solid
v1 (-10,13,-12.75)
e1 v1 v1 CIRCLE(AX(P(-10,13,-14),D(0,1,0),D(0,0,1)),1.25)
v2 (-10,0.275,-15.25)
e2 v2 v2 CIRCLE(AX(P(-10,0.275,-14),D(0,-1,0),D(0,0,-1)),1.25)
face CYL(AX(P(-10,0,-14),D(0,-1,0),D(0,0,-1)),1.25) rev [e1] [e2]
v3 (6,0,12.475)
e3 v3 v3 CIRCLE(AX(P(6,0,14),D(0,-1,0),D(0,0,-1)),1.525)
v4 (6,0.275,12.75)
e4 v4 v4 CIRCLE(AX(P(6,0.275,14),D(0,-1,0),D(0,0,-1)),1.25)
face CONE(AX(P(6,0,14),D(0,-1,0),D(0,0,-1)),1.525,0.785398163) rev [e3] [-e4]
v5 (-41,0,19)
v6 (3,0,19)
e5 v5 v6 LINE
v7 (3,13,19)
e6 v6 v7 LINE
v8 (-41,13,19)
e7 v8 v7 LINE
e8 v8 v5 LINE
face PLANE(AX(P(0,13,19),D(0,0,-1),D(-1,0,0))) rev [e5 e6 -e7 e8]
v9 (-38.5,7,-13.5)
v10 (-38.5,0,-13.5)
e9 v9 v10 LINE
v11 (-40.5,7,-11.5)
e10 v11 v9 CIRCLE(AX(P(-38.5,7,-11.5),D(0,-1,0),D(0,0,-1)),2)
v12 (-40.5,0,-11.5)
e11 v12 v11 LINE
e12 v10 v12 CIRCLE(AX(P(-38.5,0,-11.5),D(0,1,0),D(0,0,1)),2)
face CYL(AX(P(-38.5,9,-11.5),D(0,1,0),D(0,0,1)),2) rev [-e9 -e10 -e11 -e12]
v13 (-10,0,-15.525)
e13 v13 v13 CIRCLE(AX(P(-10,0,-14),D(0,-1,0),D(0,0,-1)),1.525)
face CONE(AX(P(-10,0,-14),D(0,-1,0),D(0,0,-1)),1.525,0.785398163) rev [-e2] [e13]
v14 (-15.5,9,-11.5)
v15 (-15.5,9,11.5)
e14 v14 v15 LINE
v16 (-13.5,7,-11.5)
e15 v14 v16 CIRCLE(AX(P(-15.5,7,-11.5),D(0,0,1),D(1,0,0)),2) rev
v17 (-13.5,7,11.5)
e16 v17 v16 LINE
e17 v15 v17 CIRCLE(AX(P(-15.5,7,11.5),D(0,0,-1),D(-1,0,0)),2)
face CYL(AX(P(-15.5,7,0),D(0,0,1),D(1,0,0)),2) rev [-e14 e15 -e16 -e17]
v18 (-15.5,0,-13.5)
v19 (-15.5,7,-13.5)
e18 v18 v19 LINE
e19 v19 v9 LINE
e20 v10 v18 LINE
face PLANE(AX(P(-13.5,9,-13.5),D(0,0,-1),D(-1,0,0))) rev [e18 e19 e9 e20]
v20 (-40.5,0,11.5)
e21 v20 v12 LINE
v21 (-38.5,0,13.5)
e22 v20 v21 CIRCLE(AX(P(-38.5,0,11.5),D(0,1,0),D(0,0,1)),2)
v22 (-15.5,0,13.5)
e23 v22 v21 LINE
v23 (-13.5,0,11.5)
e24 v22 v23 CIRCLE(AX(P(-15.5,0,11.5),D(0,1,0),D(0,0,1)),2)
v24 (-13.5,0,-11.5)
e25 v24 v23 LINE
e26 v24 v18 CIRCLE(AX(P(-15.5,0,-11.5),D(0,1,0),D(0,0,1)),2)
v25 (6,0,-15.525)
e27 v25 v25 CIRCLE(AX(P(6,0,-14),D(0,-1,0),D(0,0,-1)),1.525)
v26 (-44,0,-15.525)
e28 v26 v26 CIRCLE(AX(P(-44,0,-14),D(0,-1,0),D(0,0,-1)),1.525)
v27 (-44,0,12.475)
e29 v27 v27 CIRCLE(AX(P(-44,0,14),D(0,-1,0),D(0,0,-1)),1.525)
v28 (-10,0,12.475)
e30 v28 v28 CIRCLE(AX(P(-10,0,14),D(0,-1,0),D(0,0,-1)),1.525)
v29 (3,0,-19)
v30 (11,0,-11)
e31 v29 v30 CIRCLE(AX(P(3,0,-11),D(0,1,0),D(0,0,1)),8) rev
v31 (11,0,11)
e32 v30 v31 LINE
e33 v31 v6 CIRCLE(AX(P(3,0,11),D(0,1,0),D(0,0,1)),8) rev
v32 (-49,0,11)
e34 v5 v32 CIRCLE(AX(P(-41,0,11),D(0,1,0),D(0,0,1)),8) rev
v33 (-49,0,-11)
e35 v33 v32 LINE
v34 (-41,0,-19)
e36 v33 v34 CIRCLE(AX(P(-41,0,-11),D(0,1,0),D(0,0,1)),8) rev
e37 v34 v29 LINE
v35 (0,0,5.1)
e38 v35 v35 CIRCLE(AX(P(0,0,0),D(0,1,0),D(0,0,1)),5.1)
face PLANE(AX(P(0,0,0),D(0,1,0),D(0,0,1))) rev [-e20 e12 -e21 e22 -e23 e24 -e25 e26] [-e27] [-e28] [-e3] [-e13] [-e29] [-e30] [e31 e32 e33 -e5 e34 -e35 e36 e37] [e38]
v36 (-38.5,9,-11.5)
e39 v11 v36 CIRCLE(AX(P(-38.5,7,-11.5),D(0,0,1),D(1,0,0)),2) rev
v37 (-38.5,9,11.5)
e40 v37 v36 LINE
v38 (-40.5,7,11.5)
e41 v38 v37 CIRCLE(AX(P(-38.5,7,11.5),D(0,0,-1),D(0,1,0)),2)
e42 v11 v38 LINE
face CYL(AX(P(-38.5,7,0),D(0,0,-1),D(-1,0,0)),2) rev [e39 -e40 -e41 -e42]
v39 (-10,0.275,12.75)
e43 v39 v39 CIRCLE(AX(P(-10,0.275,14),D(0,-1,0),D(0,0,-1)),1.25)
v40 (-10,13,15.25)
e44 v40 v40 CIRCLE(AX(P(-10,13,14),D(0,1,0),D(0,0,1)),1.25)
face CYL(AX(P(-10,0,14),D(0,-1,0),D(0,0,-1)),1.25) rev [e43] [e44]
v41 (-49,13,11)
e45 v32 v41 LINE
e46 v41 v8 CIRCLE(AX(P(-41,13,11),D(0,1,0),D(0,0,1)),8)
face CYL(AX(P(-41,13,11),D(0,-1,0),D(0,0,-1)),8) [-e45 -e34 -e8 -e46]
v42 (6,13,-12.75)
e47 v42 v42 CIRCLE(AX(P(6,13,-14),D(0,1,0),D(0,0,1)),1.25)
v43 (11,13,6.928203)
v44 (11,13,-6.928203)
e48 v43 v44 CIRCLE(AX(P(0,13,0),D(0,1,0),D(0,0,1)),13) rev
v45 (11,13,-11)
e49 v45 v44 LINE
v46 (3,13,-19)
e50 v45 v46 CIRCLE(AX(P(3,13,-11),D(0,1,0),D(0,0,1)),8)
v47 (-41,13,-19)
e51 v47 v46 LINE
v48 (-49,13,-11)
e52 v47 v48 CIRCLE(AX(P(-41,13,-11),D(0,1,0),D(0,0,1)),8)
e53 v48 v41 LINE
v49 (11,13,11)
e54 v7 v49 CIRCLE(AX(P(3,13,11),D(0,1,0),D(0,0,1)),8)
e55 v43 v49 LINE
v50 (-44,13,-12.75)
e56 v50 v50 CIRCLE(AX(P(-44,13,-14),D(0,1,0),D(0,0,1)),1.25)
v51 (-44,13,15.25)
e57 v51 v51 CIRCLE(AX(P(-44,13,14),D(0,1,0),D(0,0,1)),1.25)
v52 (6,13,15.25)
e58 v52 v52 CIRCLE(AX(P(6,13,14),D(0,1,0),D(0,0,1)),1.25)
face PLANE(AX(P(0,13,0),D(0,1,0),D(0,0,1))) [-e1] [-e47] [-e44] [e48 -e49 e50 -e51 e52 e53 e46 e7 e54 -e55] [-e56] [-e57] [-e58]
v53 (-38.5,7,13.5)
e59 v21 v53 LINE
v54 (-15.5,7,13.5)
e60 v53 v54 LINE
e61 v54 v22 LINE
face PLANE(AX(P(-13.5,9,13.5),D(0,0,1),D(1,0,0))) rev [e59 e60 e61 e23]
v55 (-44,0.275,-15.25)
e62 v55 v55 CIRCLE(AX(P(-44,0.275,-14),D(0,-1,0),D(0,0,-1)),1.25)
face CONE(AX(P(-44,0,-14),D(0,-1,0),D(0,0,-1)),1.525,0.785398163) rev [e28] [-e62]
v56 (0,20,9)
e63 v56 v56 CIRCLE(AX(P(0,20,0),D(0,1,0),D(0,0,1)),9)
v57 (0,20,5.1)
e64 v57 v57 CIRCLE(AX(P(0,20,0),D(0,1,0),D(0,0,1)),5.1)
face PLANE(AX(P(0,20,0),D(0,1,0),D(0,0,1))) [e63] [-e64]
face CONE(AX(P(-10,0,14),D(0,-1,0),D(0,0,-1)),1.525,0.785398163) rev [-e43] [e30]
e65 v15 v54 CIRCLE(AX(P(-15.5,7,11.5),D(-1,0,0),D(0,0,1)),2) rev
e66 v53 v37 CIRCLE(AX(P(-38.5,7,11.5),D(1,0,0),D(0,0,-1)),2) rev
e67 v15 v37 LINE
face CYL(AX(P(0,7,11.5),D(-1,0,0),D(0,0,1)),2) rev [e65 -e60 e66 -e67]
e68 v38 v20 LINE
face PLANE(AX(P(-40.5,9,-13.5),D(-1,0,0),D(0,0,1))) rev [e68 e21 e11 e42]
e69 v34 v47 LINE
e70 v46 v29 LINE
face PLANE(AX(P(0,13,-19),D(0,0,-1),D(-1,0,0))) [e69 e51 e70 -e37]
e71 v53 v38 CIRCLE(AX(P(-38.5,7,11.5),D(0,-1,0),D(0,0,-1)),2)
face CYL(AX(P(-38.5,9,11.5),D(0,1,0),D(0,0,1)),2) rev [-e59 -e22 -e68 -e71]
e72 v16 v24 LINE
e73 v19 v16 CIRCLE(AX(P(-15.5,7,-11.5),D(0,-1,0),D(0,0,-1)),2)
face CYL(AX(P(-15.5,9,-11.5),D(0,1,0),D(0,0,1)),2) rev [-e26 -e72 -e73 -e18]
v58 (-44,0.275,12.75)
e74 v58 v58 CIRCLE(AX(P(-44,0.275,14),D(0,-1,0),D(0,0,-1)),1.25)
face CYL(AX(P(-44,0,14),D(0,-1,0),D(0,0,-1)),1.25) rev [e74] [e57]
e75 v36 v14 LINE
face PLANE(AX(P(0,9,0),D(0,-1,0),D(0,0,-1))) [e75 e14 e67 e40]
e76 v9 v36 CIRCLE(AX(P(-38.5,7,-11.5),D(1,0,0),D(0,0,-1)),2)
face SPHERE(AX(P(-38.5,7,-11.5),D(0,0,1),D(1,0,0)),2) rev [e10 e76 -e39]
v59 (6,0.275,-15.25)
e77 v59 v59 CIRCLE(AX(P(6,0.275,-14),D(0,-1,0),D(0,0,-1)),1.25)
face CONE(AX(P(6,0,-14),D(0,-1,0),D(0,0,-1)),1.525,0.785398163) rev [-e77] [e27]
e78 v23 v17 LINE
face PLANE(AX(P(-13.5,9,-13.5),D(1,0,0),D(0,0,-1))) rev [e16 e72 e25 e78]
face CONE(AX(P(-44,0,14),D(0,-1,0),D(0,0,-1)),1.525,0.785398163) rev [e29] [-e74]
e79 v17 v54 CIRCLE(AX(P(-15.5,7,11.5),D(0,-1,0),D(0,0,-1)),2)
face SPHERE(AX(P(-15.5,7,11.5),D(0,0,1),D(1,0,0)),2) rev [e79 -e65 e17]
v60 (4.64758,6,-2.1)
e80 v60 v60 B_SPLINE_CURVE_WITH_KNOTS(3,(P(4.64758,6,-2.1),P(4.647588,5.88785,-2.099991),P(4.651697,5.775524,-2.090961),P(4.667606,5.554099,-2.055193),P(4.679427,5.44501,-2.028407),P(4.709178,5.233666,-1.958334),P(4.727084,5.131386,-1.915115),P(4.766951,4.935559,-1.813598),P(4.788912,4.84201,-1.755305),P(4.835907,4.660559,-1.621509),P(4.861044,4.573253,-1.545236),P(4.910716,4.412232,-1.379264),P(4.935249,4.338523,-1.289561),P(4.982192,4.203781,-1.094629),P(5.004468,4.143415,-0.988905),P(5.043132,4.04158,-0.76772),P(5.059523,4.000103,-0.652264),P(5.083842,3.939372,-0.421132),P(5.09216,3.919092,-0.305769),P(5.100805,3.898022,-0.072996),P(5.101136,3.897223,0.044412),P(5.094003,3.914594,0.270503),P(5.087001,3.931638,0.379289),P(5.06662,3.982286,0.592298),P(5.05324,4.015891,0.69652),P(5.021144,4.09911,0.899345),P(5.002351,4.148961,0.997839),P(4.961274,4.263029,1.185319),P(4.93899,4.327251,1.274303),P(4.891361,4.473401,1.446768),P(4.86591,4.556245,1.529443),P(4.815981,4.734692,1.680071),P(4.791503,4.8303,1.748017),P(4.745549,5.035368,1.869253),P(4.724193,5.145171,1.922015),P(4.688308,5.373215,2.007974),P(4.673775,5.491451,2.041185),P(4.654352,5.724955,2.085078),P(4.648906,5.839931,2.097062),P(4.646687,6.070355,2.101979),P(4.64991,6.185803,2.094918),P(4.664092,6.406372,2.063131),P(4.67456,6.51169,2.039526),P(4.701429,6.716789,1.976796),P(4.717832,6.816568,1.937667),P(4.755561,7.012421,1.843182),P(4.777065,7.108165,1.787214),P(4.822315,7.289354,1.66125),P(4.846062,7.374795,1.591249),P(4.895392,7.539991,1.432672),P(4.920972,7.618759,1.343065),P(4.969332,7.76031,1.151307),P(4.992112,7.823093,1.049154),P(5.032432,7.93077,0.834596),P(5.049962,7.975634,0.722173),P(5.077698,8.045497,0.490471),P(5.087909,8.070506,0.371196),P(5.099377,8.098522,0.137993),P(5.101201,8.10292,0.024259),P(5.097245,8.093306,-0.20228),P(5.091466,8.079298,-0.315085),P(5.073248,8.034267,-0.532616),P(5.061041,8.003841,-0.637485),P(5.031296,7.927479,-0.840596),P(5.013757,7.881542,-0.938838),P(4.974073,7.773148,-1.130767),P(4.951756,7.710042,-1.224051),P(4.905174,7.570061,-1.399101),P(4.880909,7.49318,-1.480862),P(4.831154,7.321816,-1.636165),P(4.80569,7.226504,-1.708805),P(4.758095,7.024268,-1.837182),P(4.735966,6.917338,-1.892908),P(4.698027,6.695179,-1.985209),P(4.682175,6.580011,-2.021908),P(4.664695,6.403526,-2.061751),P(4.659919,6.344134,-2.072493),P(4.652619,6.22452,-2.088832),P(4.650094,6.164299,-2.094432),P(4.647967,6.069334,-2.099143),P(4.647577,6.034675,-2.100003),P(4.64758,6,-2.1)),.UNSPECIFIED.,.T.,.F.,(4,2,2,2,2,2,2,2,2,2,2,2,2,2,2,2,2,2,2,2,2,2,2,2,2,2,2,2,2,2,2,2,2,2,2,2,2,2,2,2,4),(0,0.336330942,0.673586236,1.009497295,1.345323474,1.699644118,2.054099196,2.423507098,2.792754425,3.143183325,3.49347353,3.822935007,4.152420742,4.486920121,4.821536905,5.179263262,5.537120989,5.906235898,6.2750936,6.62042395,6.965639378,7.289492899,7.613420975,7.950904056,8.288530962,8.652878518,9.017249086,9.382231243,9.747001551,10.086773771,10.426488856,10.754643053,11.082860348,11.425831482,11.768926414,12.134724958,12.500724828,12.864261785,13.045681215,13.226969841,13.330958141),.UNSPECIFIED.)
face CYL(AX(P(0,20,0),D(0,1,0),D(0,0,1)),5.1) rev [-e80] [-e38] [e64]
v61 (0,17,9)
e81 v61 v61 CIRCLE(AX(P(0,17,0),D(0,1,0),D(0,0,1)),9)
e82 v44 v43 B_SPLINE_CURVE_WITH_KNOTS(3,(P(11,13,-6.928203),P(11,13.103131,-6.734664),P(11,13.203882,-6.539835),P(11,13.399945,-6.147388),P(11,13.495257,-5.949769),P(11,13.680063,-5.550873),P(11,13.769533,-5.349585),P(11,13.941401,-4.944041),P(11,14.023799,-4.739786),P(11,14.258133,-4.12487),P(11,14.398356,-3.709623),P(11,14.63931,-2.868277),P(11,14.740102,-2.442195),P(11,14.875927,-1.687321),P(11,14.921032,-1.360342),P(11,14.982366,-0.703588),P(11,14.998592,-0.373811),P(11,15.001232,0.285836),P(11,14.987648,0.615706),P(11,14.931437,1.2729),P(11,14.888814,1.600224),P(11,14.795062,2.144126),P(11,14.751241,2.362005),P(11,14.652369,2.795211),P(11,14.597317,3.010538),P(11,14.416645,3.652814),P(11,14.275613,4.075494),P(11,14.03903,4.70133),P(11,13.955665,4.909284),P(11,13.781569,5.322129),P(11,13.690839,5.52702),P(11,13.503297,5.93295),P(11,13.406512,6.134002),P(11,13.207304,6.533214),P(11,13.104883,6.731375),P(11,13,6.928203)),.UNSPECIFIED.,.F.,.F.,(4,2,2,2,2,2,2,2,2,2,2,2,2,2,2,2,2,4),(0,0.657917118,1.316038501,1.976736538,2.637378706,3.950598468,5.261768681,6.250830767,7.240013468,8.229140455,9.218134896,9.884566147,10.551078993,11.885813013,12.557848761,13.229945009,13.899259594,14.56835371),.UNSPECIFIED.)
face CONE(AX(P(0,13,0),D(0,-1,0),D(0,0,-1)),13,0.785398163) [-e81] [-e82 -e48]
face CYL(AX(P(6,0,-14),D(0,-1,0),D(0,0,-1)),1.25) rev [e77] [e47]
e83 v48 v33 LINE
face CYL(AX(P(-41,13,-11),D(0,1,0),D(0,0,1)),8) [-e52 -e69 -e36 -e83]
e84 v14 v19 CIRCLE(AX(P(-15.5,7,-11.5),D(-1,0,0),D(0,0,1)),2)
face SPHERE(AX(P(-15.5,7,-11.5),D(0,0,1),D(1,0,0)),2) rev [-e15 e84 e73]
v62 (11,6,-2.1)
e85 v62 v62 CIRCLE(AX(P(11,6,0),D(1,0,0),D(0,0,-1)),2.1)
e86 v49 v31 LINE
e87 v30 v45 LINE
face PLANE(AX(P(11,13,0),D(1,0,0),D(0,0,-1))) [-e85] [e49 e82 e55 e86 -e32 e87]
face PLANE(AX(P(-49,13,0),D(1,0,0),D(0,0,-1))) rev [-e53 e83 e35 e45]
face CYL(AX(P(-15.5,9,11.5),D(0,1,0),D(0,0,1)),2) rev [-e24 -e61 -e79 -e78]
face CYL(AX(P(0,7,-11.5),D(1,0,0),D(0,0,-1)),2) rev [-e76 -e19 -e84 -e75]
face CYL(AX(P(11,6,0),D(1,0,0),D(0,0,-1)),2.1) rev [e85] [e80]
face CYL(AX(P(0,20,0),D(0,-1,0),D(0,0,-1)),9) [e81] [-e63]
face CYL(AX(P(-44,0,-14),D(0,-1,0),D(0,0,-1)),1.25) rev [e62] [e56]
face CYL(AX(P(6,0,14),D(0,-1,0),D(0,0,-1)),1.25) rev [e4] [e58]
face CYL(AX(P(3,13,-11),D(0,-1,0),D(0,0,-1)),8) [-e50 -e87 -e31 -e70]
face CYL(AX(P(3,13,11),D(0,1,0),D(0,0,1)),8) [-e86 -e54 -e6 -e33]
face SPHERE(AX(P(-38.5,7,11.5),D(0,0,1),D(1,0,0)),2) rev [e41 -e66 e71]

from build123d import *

# Parameters (mm, degrees)
SKETCH1_W                               = 60
SKETCH1_H                               = 38
BASE_DEPTH                              = 13
ADDALITTLEBEAUTY_R                      = 8
SKETCH1_3_R                             = 9
RODHOLDER_DEPTH                         = 20
M5X0_8_TAPPED_HOLE_FOR_FIXING_ROD_D     = 4.2
M5X0_8_TAPPED_HOLE_FOR_FIXING_ROD_DEPTH = 10.4
M5X0_8_TAPPED_HOLE_FOR_FIXING_ROD_TIP   = 1.2618073
CHAMFER1_SIZE                           = 4
F_10_2_10_2_ROD_HOLE_D                  = 10.2
M3X0_5_TAPPED_HOLE1_D                   = 2.5
M3X0_5_TAPPED_HOLE1_CSINK_D             = 3.05
M3X0_5_TAPPED_HOLE1_CSINK_ANGLE         = 90
SKETCH9_W                               = 27
SKETCH9_H                               = 27
CUT_EXTRUDE1_DEPTH                      = 9
FILLET1_R                               = 2


with BuildPart() as part:
    # Sketch1 → Base (new body)
    with BuildSketch(Plane(origin=(0, 0, 0), x_dir=(1, 0, 0), z_dir=(0, 1, 0))):
        with Locations((-19, 0)):
            Rectangle(SKETCH1_W, SKETCH1_H)
    extrude(amount=BASE_DEPTH)

    # AddALittleBeauty
    addalittlebeauty_edges = [part.edges().sort_by_distance(p)[0] for p in [
        (11, 6.5, -19),
        (11, 6.5, 19),
        (-49, 6.5, 19),
        (-49, 6.5, -19),
    ]]
    fillet(addalittlebeauty_edges, radius=ADDALITTLEBEAUTY_R)

    # Sketch1<3> → RodHolder (add)
    with BuildSketch(Plane(origin=(0, 0, 0), x_dir=(1, 0, 0), z_dir=(0, 1, 0))):
        with Locations(Location((0, 0, 0), (0, 0, 270))):
            Circle(SKETCH1_3_R)
    extrude(amount=RODHOLDER_DEPTH)

    # M5x0.8 Tapped Hole for fixing rod
    with Locations(Plane(origin=(11, 0, 0), x_dir=(0, 0, -1), z_dir=(1, 0, 0))):
        with Locations((0, 6)):
            Hole(M5X0_8_TAPPED_HOLE_FOR_FIXING_ROD_D / 2, depth=M5X0_8_TAPPED_HOLE_FOR_FIXING_ROD_DEPTH)
            with Locations((0, 0, -(M5X0_8_TAPPED_HOLE_FOR_FIXING_ROD_DEPTH + M5X0_8_TAPPED_HOLE_FOR_FIXING_ROD_TIP / 2))):  # 118° drill point
                Cone(0, M5X0_8_TAPPED_HOLE_FOR_FIXING_ROD_D / 2, M5X0_8_TAPPED_HOLE_FOR_FIXING_ROD_TIP, mode=Mode.SUBTRACT)

    # Chamfer1
    # the kernel refuses this chamfer: 4 mm, written as the material it adds along each edge
    with BuildSketch(Plane(origin=(0, 13, 0), x_dir=(0, 0, 1), z_dir=(1, 0, 0))) as chamfer1_piece_1_section:
        Polygon((9 + CHAMFER1_SIZE, 0), (9, -CHAMFER1_SIZE), (9, 0), align=None)
    chamfer1_piece_1 = revolve(axis=Axis((0, 13, 0), (0, -1, 0)), mode=Mode.PRIVATE)
    chamfer1_piece_1 = split(chamfer1_piece_1, bisect_by=Plane(origin=(11, 14.941949716, -10.941949716), z_dir=(-1, 0, 0)), keep=Keep.TOP, mode=Mode.PRIVATE)
    add(chamfer1_piece_1)

    # Ø10.2 (10.2) Rod Hole (through all)
    with Locations(Plane(origin=(0, 20, 0), x_dir=(1, 0, 0), z_dir=(0, 1, 0))):
        with Locations((0, 0)):
            Hole(F_10_2_10_2_ROD_HOLE_D / 2)

    # M3x0.5 Tapped Hole1 (through all)
    with Locations(Plane(origin=(0, 0, 0), x_dir=(-1, 0, 0), z_dir=(0, -1, 0))):
        with Locations((-6, 14), (-6, -14), (44, -14), (44, 14), (10, 14), (10, -14)):
            CounterSinkHole(M3X0_5_TAPPED_HOLE1_D / 2, M3X0_5_TAPPED_HOLE1_CSINK_D / 2, counter_sink_angle=M3X0_5_TAPPED_HOLE1_CSINK_ANGLE)

    # Sketch9 → Cut-Extrude1 (cut)
    with BuildSketch(Plane.XZ):
        with Locations((-27, 0)):
            Rectangle(SKETCH9_W, SKETCH9_H)
    extrude(amount=-CUT_EXTRUDE1_DEPTH, mode=Mode.SUBTRACT)

    # Fillet1
    fillet1_edges = [part.edges().sort_by_distance(p)[0] for p in [
        (-40.5, 9, 0),
        (-40.5, 4.5, -13.5),
        (-27, 9, 13.5),
        (-40.5, 4.5, 13.5),
        (-13.5, 9, 0),
        (-13.5, 4.5, 13.5),
        (-27, 9, -13.5),
        (-13.5, 4.5, -13.5),
    ]]
    fillet(fillet1_edges, radius=FILLET1_R)


solid = part.part
